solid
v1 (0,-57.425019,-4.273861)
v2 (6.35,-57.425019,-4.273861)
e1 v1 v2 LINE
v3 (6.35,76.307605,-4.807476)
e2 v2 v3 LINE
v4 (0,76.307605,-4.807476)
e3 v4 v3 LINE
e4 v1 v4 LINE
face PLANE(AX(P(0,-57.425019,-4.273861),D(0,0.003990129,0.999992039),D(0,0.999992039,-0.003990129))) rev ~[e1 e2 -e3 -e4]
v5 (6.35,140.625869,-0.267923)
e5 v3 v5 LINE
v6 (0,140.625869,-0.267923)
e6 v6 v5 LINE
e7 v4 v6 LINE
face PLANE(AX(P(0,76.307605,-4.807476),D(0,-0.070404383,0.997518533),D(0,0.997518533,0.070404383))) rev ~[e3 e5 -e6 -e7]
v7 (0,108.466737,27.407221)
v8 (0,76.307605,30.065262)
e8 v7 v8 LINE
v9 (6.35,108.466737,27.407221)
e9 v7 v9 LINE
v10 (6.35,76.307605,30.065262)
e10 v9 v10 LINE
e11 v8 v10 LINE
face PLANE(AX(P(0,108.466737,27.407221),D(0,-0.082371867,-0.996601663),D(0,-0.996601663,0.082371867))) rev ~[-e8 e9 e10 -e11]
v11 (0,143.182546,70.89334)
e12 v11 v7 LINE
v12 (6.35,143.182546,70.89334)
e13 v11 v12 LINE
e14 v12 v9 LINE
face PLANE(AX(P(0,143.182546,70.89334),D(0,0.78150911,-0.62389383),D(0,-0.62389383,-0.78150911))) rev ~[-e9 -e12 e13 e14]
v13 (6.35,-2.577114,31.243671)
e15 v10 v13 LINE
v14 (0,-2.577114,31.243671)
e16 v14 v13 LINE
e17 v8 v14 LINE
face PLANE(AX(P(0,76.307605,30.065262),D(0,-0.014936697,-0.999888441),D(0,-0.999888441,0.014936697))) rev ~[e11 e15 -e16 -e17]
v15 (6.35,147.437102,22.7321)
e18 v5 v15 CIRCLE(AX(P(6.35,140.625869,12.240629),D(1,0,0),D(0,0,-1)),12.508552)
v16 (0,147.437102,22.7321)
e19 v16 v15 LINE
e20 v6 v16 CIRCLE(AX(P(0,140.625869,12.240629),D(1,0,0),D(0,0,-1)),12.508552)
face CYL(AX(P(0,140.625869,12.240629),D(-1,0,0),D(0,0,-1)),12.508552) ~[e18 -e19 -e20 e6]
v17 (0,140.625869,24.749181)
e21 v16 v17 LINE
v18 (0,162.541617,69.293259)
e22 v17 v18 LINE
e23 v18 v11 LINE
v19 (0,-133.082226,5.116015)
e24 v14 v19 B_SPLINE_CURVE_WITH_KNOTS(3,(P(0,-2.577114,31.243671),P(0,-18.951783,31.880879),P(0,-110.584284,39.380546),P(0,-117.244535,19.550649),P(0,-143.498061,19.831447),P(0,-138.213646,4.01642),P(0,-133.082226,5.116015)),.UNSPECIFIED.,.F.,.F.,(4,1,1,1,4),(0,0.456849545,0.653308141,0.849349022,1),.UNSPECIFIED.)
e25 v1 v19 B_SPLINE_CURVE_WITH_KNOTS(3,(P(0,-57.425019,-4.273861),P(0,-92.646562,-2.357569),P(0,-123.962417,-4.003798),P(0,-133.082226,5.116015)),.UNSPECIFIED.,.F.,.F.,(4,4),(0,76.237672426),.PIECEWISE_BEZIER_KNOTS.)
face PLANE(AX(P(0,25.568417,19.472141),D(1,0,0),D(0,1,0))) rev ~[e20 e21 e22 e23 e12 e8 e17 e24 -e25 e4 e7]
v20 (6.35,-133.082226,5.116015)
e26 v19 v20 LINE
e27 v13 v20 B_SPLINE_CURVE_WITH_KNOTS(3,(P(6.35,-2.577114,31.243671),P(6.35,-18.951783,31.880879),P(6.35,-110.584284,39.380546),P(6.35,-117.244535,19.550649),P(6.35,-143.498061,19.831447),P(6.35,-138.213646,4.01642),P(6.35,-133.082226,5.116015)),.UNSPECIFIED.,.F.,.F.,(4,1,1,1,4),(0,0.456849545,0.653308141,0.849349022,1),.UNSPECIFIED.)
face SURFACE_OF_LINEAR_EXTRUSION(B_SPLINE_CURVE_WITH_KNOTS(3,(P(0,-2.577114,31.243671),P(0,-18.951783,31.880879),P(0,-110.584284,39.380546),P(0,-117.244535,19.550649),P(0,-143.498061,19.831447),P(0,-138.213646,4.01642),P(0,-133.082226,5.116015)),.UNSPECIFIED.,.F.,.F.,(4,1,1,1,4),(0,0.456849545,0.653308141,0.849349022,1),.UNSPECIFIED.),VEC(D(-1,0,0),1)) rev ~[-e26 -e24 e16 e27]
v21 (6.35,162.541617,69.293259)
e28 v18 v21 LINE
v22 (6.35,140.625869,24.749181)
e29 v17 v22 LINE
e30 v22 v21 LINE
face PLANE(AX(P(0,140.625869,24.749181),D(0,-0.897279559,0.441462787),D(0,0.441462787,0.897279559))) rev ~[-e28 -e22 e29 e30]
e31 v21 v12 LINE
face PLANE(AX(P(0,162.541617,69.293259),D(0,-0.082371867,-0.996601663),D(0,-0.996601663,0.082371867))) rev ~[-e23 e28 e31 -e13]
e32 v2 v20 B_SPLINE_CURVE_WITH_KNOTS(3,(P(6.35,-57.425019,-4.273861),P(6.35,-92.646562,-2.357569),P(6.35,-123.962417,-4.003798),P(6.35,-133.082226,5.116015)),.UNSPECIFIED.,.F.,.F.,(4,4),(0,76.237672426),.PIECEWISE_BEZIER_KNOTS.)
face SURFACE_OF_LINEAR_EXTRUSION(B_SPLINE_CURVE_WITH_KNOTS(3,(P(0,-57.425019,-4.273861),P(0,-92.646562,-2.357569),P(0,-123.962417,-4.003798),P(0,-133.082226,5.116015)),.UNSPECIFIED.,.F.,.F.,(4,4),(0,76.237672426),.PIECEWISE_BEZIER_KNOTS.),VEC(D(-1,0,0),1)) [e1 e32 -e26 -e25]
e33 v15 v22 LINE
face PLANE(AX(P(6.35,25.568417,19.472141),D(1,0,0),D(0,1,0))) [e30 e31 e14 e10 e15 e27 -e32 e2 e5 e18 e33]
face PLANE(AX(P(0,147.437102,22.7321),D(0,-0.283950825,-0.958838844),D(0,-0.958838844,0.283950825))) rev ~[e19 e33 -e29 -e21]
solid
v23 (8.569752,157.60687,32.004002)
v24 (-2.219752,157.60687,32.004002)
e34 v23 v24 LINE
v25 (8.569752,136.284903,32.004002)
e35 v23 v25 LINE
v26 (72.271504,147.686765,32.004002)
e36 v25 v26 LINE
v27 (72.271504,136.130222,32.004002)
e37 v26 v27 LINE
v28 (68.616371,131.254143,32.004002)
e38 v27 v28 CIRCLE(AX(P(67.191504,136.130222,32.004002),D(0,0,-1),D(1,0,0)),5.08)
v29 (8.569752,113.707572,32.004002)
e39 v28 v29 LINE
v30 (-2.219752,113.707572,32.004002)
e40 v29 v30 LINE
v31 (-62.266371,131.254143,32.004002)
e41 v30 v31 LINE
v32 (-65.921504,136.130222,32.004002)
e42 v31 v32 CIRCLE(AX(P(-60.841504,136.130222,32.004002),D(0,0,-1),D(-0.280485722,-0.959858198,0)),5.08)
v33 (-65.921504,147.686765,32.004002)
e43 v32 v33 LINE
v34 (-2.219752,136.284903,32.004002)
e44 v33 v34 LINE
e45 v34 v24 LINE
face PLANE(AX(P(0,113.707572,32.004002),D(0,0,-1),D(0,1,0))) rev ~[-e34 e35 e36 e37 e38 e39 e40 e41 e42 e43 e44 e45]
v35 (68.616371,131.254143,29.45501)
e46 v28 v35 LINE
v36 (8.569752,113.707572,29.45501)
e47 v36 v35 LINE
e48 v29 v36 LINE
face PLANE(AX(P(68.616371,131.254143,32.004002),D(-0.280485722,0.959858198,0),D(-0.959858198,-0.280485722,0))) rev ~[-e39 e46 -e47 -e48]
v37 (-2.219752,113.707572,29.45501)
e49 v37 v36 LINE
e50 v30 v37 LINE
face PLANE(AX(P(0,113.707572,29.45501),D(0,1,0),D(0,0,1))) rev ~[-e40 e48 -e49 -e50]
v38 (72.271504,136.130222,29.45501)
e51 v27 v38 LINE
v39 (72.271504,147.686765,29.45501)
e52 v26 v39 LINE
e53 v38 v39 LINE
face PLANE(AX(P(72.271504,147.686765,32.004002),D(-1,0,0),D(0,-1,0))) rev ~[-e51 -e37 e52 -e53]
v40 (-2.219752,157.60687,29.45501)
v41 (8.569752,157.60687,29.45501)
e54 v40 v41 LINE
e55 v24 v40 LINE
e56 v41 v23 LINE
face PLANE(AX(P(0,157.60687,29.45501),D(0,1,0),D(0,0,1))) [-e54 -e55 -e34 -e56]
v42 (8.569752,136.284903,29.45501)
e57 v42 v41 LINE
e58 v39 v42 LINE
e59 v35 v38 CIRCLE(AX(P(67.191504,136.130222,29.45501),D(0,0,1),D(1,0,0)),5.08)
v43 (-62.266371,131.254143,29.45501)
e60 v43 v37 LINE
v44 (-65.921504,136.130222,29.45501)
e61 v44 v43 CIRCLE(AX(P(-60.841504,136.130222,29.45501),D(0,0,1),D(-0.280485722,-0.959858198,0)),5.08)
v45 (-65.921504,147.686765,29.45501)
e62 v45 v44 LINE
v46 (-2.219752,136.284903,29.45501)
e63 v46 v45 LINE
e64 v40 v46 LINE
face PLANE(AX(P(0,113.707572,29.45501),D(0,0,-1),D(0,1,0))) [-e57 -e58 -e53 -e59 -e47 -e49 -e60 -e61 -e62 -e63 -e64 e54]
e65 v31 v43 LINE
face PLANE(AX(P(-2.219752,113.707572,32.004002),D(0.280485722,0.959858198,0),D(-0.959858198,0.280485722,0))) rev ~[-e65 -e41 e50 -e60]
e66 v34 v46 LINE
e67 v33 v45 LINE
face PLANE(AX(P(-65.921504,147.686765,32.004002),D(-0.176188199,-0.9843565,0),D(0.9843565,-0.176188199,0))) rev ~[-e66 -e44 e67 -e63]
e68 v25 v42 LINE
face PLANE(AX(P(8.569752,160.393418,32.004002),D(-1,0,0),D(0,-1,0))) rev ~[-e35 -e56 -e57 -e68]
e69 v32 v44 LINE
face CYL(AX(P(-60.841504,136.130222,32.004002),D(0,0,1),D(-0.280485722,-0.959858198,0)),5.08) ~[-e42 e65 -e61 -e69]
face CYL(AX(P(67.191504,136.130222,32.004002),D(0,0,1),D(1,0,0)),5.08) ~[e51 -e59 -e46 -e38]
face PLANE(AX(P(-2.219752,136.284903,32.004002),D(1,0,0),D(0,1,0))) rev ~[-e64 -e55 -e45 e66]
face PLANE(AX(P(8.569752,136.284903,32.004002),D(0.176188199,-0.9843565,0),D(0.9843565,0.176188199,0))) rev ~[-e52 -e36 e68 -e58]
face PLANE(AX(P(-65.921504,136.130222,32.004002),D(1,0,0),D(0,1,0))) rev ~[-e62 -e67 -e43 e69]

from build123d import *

# Parameters (mm, degrees)
F1_DEPTH = 6.35
F2_W     = 43.8992977142
F2_H     = 2.5489926338
F3_DEPTH = 132.08
F5_DEPTH = 25.4


# Not quite as in the source:
# - a feature names something its author has since deleted; it is built from what else it names


with BuildPart() as f1:
    # F0 (on Right) → F1 (new body)
    with BuildSketch(Plane.YZ):
        with BuildLine():
            Line((76.3076053803, 30.0652621201), (-2.577113572, 31.2436707318))
            add(Edge.make_bspline(
                [(-2.577113572, 31.2436707318), (-18.9517831163, 31.8808788266), (-110.584283844, 39.3805456931), (-117.2445348924, 19.5506491484), (-143.4980605313, 19.8314466417), (-138.213646076, 4.0164198283), (-133.0822259188, 5.1160147414)],
                knots=[0, 0, 0, 0, 0.4568495448, 0.6533081411, 0.8493490225, 1, 1, 1, 1], degree=3))
            add(Edge.make_bspline(
                [(-57.4250192094, -4.2738611867), (-92.646561563, -2.3575690575), (-123.9624172449, -4.0037976578), (-133.0822259188, 5.1160147414)],
                knots=[0, 0, 0, 0, 76.2376724265, 76.2376724265, 76.2376724265, 76.2376724265], degree=3))
            Line((-57.4250192094, -4.2738611867), (76.3076053803, -4.8074758588))
            Line((76.3076053803, -4.8074758588), (140.6258685644, -0.2679234478))
            ThreePointArc((140.6258685644, -0.2679234478), (152.6195542591, 8.6888150074), (147.4371024588, 22.732100009))
            Line((147.4371024588, 22.732100009), (140.6258685644, 24.7491808721))
            Line((140.6258685644, 24.7491808721), (162.5416169533, 69.2932593767))
            Line((162.5416169533, 69.2932593767), (143.1825459003, 70.8933398128))
            Line((143.1825459003, 70.8933398128), (108.4667369723, 27.4072214961))
            Line((108.4667369723, 27.4072214961), (76.3076053803, 30.0652621201))
        make_face()
    extrude(amount=F1_DEPTH)


with BuildPart() as f3:
    # F2 (on Right) → F3 (new body, symmetric)
    with BuildSketch(Plane.YZ):
        with Locations((135.6572210789, 30.7295061648)):
            Rectangle(F2_W, F2_H)
    extrude(amount=F3_DEPTH, both=True)

    # F4 (on face) → F5 (cut)
    with BuildSketch(Plane.XY.offset(32.0040024817)):
        with BuildLine():
            Line((68.6163709771, 131.2541425074), (8.5697518662, 113.7075722218))
            Line((8.5697518662, 113.7075722218), (11.151721701, 106.6866666079))
            Line((11.151721701, 106.6866666079), (138.4570300579, 103.6873310804))
            Line((138.4570300579, 103.6873310804), (142.1228945255, 164.6739095449))
            Line((142.1228945255, 164.6739095449), (8.5697518662, 160.3934181468))
            Line((8.5697518662, 160.3934181468), (8.5697518662, 136.2849026918))
            Line((8.5697518662, 136.2849026918), (72.2715035081, 147.6867645979))
            Line((72.2715035081, 147.6867645979), (72.2715035081, 136.1302221516))
            ThreePointArc((72.2715035081, 136.1302221516), (71.256274519, 133.0832504371), (68.6163709771, 131.2541425074))
        make_face()
        with BuildLine():
            Line((-65.9215035081, 147.6867645979), (-2.2197518662, 136.2849026918))
            Line((-2.2197518662, 136.2849026918), (-2.2197518662, 160.3934181468))
            Line((-2.2197518662, 160.3934181468), (-135.7728945255, 164.6739095449))
            Line((-135.7728945255, 164.6739095449), (-132.1070300579, 103.6873310804))
            Line((-132.1070300579, 103.6873310804), (-4.801721701, 106.6866666079))
            Line((-4.801721701, 106.6866666079), (-2.2197518662, 113.7075722218))
            Line((-2.2197518662, 113.7075722218), (-62.2663709771, 131.2541425074))
            ThreePointArc((-62.2663709771, 131.2541425074), (-64.906274519, 133.0832504371), (-65.9215035081, 136.1302221516))
            Line((-65.9215035081, 136.1302221516), (-65.9215035081, 147.6867645979))
        make_face()
    extrude(amount=-F5_DEPTH, mode=Mode.SUBTRACT)


solid = Compound([f1.part, f3.part])
